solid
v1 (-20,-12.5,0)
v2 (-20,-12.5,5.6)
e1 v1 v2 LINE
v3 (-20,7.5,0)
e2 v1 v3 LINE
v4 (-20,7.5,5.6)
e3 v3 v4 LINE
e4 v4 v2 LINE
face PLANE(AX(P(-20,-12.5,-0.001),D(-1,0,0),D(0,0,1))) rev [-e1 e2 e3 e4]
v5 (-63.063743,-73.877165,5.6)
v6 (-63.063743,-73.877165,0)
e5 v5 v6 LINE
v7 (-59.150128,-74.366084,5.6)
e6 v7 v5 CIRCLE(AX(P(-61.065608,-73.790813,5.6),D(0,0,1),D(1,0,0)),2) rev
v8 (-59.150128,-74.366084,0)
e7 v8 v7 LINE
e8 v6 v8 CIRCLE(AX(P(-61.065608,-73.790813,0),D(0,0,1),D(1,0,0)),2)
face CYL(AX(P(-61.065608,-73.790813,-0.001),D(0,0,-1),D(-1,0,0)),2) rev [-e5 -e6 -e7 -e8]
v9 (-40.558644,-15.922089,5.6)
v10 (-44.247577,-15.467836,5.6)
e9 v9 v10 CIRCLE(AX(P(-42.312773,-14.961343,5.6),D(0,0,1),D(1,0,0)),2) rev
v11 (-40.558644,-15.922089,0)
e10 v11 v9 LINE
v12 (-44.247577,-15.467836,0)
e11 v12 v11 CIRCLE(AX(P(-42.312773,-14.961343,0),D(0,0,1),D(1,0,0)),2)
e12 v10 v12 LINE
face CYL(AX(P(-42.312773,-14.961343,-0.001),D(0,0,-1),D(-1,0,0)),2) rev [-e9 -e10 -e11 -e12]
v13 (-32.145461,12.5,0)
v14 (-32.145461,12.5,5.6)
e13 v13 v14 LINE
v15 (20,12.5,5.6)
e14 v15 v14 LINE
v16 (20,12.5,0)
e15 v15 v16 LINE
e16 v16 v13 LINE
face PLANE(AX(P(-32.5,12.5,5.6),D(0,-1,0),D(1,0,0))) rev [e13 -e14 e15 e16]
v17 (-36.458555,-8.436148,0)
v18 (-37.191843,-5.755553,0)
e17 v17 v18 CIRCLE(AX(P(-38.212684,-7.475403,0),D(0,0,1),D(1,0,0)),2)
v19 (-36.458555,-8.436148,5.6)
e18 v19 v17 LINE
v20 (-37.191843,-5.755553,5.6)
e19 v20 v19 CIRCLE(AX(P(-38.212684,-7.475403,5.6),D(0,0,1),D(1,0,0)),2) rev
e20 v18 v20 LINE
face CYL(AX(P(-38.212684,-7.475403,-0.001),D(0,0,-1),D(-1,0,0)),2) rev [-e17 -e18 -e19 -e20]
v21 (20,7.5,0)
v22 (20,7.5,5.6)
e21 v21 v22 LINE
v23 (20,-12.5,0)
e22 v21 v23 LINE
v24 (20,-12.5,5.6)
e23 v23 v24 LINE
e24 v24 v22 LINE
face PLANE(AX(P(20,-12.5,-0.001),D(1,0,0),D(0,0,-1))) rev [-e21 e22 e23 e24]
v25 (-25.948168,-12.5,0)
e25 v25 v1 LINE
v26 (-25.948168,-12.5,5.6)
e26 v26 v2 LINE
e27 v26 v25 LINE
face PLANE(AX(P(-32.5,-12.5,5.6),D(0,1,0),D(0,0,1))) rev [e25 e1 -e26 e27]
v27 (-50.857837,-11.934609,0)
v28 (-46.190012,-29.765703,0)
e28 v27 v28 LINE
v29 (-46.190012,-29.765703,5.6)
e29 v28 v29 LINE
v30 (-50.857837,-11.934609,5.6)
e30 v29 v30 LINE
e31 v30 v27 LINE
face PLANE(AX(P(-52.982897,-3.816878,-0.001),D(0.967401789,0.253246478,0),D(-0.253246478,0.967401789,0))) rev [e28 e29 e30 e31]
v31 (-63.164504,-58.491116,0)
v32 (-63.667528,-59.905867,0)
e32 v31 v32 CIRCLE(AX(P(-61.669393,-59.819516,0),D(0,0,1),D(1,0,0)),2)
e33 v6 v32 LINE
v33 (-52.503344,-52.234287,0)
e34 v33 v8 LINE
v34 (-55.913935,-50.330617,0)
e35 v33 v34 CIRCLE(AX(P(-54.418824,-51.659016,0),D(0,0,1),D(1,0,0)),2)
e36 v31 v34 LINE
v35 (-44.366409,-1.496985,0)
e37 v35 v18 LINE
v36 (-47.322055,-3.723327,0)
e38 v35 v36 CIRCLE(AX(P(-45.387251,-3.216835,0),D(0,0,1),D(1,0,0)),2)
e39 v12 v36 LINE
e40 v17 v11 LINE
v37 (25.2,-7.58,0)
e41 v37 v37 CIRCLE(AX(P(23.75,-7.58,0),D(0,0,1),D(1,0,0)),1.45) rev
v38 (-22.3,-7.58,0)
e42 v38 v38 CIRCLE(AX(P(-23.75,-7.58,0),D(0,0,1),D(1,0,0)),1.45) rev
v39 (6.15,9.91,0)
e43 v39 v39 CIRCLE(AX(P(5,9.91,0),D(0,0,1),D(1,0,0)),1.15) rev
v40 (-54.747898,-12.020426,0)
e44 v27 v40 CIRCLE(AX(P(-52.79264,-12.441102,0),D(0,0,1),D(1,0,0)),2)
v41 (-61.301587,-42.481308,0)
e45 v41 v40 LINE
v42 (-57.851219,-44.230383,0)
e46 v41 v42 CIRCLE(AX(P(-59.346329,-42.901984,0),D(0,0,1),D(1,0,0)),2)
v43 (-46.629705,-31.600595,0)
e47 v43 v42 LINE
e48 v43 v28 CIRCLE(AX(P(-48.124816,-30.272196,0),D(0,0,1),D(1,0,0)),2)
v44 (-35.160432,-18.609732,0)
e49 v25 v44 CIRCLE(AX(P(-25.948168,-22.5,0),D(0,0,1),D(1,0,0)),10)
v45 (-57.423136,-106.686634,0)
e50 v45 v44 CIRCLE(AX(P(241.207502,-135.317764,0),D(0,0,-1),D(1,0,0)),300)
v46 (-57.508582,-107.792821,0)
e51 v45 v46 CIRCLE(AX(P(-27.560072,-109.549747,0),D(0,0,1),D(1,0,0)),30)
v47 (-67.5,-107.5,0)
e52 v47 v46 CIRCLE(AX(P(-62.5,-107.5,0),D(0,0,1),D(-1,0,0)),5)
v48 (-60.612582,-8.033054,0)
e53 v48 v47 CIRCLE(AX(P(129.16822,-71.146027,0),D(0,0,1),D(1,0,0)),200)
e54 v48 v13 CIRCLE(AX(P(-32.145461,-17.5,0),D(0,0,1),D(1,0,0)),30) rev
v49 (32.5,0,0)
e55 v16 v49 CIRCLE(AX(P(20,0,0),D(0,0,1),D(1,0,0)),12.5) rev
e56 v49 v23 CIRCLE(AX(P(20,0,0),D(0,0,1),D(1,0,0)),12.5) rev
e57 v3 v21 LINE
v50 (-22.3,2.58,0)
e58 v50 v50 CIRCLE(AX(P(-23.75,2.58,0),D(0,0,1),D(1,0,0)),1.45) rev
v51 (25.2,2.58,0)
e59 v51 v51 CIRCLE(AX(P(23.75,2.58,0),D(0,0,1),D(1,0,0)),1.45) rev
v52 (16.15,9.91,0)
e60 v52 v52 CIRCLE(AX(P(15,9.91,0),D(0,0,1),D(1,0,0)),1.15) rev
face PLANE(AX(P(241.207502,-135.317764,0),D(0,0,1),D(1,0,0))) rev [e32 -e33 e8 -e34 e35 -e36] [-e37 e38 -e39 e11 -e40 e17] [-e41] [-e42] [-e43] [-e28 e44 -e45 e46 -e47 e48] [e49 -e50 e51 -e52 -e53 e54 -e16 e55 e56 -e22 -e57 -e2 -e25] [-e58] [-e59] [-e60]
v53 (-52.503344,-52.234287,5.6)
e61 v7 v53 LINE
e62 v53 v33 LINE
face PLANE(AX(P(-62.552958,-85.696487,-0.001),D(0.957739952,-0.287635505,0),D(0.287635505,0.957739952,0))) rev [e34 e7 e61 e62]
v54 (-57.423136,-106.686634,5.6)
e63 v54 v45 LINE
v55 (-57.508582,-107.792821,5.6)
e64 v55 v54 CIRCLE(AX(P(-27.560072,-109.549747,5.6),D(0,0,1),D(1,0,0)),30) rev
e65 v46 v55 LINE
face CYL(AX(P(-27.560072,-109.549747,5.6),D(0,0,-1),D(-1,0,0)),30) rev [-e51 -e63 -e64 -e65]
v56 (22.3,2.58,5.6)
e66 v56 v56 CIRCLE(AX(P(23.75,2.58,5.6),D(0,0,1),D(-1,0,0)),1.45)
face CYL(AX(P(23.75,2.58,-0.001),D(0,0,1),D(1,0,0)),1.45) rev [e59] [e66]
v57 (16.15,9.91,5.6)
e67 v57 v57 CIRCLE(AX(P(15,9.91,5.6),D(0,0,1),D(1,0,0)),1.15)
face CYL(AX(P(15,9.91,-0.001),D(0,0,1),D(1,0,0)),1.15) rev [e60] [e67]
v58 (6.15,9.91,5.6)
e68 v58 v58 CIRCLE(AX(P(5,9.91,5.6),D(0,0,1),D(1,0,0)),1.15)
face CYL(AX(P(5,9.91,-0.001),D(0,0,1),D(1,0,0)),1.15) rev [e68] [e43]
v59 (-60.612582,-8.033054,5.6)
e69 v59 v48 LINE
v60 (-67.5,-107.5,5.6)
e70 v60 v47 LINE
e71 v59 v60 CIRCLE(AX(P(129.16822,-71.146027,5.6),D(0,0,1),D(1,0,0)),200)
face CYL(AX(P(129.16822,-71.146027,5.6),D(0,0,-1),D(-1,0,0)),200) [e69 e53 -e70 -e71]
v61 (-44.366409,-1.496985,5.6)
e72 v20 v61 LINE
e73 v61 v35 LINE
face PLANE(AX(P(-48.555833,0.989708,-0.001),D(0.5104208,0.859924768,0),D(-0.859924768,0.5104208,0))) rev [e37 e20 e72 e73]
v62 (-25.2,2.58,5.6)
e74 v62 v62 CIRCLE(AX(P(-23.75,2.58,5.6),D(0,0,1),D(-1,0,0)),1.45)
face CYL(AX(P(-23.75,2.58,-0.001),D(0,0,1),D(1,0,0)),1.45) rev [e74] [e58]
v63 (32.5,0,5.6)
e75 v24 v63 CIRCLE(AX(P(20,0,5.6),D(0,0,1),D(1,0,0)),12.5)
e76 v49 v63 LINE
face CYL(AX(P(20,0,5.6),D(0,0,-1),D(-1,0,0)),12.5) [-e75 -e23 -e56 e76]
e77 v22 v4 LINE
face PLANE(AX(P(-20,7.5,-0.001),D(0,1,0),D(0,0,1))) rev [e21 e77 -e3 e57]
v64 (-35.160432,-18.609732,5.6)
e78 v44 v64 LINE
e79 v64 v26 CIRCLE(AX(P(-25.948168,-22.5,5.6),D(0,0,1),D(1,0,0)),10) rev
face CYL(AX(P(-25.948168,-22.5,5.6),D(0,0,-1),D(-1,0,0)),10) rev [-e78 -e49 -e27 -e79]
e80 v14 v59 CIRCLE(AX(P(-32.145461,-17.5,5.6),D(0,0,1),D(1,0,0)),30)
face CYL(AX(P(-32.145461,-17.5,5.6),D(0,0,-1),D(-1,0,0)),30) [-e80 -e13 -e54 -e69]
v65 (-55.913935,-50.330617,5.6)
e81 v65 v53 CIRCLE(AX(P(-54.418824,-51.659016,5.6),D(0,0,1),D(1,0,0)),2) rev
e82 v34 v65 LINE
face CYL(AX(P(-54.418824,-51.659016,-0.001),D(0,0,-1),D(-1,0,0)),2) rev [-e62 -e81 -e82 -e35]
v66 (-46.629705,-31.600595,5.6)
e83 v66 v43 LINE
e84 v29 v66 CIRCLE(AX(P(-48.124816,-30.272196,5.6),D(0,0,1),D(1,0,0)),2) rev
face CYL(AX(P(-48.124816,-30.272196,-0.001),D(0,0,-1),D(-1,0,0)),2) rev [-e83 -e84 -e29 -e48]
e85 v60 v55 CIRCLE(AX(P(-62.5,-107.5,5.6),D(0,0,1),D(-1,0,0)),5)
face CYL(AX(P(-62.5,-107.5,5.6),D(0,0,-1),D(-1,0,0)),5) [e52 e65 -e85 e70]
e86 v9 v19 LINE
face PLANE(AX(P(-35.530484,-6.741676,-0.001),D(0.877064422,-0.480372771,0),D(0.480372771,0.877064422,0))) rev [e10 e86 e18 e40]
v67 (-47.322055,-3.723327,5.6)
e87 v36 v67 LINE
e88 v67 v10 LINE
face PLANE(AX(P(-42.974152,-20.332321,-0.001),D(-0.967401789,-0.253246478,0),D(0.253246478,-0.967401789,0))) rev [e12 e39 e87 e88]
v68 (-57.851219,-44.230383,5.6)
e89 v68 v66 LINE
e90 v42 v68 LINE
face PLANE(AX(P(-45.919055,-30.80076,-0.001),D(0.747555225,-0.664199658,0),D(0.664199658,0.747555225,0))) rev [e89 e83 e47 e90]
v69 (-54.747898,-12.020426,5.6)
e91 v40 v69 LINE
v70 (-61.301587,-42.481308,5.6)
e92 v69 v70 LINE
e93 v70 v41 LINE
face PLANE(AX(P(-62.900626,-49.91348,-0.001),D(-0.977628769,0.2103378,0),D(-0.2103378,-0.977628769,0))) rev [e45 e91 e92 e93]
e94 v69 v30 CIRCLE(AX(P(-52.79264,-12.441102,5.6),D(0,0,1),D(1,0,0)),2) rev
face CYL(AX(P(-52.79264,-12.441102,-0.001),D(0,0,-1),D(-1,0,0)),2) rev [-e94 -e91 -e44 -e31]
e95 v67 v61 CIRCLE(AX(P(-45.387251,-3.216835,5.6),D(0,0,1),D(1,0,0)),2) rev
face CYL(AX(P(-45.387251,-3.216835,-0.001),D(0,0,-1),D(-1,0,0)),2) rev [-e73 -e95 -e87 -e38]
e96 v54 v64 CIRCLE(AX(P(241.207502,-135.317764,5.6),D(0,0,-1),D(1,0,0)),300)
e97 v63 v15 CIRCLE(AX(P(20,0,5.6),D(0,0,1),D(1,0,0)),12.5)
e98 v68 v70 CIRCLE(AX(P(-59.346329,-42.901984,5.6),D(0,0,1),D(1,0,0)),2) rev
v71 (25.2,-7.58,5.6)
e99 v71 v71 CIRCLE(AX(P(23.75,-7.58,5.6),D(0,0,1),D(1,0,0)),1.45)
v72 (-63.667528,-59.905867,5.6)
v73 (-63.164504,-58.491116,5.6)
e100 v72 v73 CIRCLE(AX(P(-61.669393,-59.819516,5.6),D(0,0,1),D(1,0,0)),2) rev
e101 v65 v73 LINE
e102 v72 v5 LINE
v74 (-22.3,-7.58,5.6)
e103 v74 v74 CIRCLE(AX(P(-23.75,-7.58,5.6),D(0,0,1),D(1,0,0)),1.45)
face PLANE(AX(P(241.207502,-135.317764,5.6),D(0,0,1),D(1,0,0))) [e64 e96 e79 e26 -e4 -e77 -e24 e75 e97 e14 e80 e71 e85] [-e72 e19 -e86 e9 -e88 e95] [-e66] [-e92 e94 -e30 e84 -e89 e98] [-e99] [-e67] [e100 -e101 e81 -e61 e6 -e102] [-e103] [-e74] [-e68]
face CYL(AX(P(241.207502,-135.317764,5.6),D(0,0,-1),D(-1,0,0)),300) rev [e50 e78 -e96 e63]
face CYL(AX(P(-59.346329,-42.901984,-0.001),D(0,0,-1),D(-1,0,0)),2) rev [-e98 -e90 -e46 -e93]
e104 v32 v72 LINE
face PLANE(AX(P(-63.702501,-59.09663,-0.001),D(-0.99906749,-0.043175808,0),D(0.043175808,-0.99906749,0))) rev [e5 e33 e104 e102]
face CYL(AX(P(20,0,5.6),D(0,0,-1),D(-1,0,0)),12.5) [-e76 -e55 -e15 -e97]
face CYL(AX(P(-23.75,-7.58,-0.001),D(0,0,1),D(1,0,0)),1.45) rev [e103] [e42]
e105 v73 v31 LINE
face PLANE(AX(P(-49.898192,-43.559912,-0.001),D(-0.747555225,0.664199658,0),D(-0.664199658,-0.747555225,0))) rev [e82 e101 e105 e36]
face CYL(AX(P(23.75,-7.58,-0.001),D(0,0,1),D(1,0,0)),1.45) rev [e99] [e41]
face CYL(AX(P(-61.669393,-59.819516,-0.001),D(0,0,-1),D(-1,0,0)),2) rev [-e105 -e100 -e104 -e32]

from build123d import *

# Parameters (mm, degrees)
BOSS_EXTRU_1_DEPTH      = 5.6
ENL_V_MAT_EXTRU_1_REACH = 135.059
ESQUISSE2_W             = 40
ESQUISSE2_H             = 20
ENL_V_MAT_EXTRU_2_REACH = 135.059
ESQUISSE3_R             = 1.45
CONG_2_R                = 12.5
CONG_3_R                = 10
CONG_4_R                = 30
CONG_5_R                = 30
ENL_V_MAT_EXTRU_3_REACH = 135.059
CONG_6_R                = 2
ENL_V_MAT_EXTRU_4_REACH = 135.059
ESQUISSE5_R             = 1.15


# Some blends are built 0.0001 mm under size
with BuildPart() as part:
    # Esquisse1 → Boss.-Extru.1 (new body)
    with BuildSketch(Plane.XY):
        with BuildLine():
            Line((-32.5, 12.5), (-52.5, 12.5))
            ThreePointArc((-52.5, 12.5), (-69.287355537, -46.339080558), (-67.5, -107.5))
            ThreePointArc((-67.5, -107.5), (-62.5, -112.5), (-57.5, -107.5))
            ThreePointArc((-57.5, -107.5), (-48.914858734, -58.969774017), (-32.5, -12.5))
            Line((-32.5, -12.5), (32.5, -12.5))
            Line((32.5, -12.5), (32.5, 12.5))
            Line((32.5, 12.5), (-32.5, 12.5))
        make_face()
    extrude(amount=BOSS_EXTRU_1_DEPTH)

    # Esquisse2 → Enlèv. mat.-Extru.1 (cut, up to next)
    with BuildSketch(Plane.XY.offset(5.6), mode=Mode.PRIVATE) as enl_v_mat_extru_1_sk1:
        with Locations((0, -2.5)):
            Rectangle(ESQUISSE2_W, ESQUISSE2_H)
    enl_v_mat_extru_1_tool1 = extrude(enl_v_mat_extru_1_sk1.sketch, amount=-ENL_V_MAT_EXTRU_1_REACH, mode=Mode.PRIVATE) & part.part
    add(enl_v_mat_extru_1_tool1.solids().sort_by_distance((0, -2.5, 5.6))[0], mode=Mode.SUBTRACT)

    # Esquisse3 → Enlèv. mat.-Extru.2 (cut, up to next)
    with BuildSketch(Plane.XY.offset(5.6), mode=Mode.PRIVATE) as enl_v_mat_extru_2_sk1:
        with Locations((-23.75, -7.58)):
            Circle(ESQUISSE3_R)
    enl_v_mat_extru_2_tool1 = extrude(enl_v_mat_extru_2_sk1.sketch, amount=-ENL_V_MAT_EXTRU_2_REACH, mode=Mode.PRIVATE) & part.part
    # Esquisse3 → Enlèv. mat.-Extru.2 (cut, up to next)
    with BuildSketch(Plane.XY.offset(5.6), mode=Mode.PRIVATE) as enl_v_mat_extru_2_sk2:
        with Locations((23.75, -7.58)):
            Circle(ESQUISSE3_R)
    enl_v_mat_extru_2_tool2 = extrude(enl_v_mat_extru_2_sk2.sketch, amount=-ENL_V_MAT_EXTRU_2_REACH, mode=Mode.PRIVATE) & part.part
    # Esquisse3 → Enlèv. mat.-Extru.2 (cut, up to next)
    with BuildSketch(Plane.XY.offset(5.6), mode=Mode.PRIVATE) as enl_v_mat_extru_2_sk3:
        with Locations((23.75, 2.58)):
            Circle(ESQUISSE3_R)
    enl_v_mat_extru_2_tool3 = extrude(enl_v_mat_extru_2_sk3.sketch, amount=-ENL_V_MAT_EXTRU_2_REACH, mode=Mode.PRIVATE) & part.part
    # Esquisse3 → Enlèv. mat.-Extru.2 (cut, up to next)
    with BuildSketch(Plane.XY.offset(5.6), mode=Mode.PRIVATE) as enl_v_mat_extru_2_sk4:
        with Locations((-23.75, 2.58)):
            Circle(ESQUISSE3_R)
    enl_v_mat_extru_2_tool4 = extrude(enl_v_mat_extru_2_sk4.sketch, amount=-ENL_V_MAT_EXTRU_2_REACH, mode=Mode.PRIVATE) & part.part
    add(enl_v_mat_extru_2_tool1.solids().sort_by_distance((-23.75, -7.58, 5.6))[0], mode=Mode.SUBTRACT)
    add(enl_v_mat_extru_2_tool2.solids().sort_by_distance((23.75, -7.58, 5.6))[0], mode=Mode.SUBTRACT)
    add(enl_v_mat_extru_2_tool3.solids().sort_by_distance((23.75, 2.58, 5.6))[0], mode=Mode.SUBTRACT)
    add(enl_v_mat_extru_2_tool4.solids().sort_by_distance((-23.75, 2.58, 5.6))[0], mode=Mode.SUBTRACT)

    # Congé2
    cong_2_edges = [part.edges().sort_by_distance(p)[0] for p in [
        (32.5, -12.5, 2.8),
        (32.5, 12.5, 2.8),
    ]]
    fillet(cong_2_edges, radius=CONG_2_R - 0.0001)  # a hair under: the kernel refuses the full size

    # Congé3
    cong_3_edges = [part.edges().sort_by_distance(p)[0] for p in [
        (-32.5, -12.5, 2.8),
    ]]
    fillet(cong_3_edges, radius=CONG_3_R)

    # Congé4
    cong_4_edges = [part.edges().sort_by_distance(p)[0] for p in [
        (-52.5, 12.5, 2.8),
    ]]
    fillet(cong_4_edges, radius=CONG_4_R)

    # Congé5
    # the kernel refuses this fillet: 30 mm, written as the material it adds along each edge
    with BuildSketch(Plane(origin=(-57.5, -107.5, 0), x_dir=(-0.029294676062998543, -0.9995708188789647, 0), z_dir=(0, 0, 1))) as cong_5_piece_1:
        with BuildLine():
            CenterArc((1.171787043, 29.987124566), CONG_5_R, 266.202223448, 2.119075089)
            ThreePointArc((-0.815268333, 0.053003384), (-0.407652209, 0.026224165), (0, 0))
            ThreePointArc((0, 0), (0.14647338, 0.002145906), (0.292946761, 0))
        make_face()
    extrude(amount=5.6)

    # Esquisse4 → Enlèv. mat.-Extru.3 (cut, up to next)
    with BuildSketch(Plane.XY.offset(5.6), mode=Mode.PRIVATE) as enl_v_mat_extru_3_sk1:
        Polygon((-35.530484253, -6.741676359), (-42.974151572, -20.332321303), (-48.555833289, 0.989708193), align=None)
    enl_v_mat_extru_3_tool1 = extrude(enl_v_mat_extru_3_sk1.sketch, amount=-ENL_V_MAT_EXTRU_3_REACH, mode=Mode.PRIVATE) & part.part
    # Esquisse4 → Enlèv. mat.-Extru.3 (cut, up to next)
    with BuildSketch(Plane.XY.offset(5.6), mode=Mode.PRIVATE) as enl_v_mat_extru_3_sk2:
        Polygon((-52.982896502, -3.816878406), (-45.919055028, -30.800759586), (-62.900626013, -49.913479621), align=None)
    enl_v_mat_extru_3_tool2 = extrude(enl_v_mat_extru_3_sk2.sketch, amount=-ENL_V_MAT_EXTRU_3_REACH, mode=Mode.PRIVATE) & part.part
    # Esquisse4 → Enlèv. mat.-Extru.3 (cut, up to next)
    with BuildSketch(Plane.XY.offset(5.6), mode=Mode.PRIVATE) as enl_v_mat_extru_3_sk3:
        Polygon((-49.898192375, -43.559912364), (-63.702500518, -59.0966302), (-62.552958266, -85.696486809), align=None)
    enl_v_mat_extru_3_tool3 = extrude(enl_v_mat_extru_3_sk3.sketch, amount=-ENL_V_MAT_EXTRU_3_REACH, mode=Mode.PRIVATE) & part.part
    add(enl_v_mat_extru_3_tool1.solids().sort_by_distance((-42.35349, -8.694763, 5.6))[0], mode=Mode.SUBTRACT)
    add(enl_v_mat_extru_3_tool2.solids().sort_by_distance((-53.934193, -28.177039, 5.6))[0], mode=Mode.SUBTRACT)
    add(enl_v_mat_extru_3_tool3.solids().sort_by_distance((-58.717884, -62.784343, 5.6))[0], mode=Mode.SUBTRACT)

    # Congé6
    cong_6_edges = [part.edges().sort_by_distance(p)[0] for p in [
        (-48.555833289, 0.989708193, 2.8),
        (-35.530484253, -6.741676359, 2.8),
        (-42.974151572, -20.332321303, 2.8),
        (-62.900626013, -49.913479621, 2.8),
        (-52.982896502, -3.816878406, 2.8),
        (-45.919055028, -30.800759586, 2.8),
        (-49.898192375, -43.559912364, 2.8),
        (-62.552958266, -85.696486809, 2.8),
        (-63.702500518, -59.0966302, 2.8),
    ]]
    fillet(cong_6_edges, radius=CONG_6_R)

    # Esquisse5 → Enlèv. mat.-Extru.4 (cut, up to next)
    with BuildSketch(Plane.XY.offset(5.6), mode=Mode.PRIVATE) as enl_v_mat_extru_4_sk1:
        with Locations((15, 9.91)):
            Circle(ESQUISSE5_R)
    enl_v_mat_extru_4_tool1 = extrude(enl_v_mat_extru_4_sk1.sketch, amount=-ENL_V_MAT_EXTRU_4_REACH, mode=Mode.PRIVATE) & part.part
    # Esquisse5 → Enlèv. mat.-Extru.4 (cut, up to next)
    with BuildSketch(Plane.XY.offset(5.6), mode=Mode.PRIVATE) as enl_v_mat_extru_4_sk2:
        with Locations((5, 9.91)):
            Circle(ESQUISSE5_R)
    enl_v_mat_extru_4_tool2 = extrude(enl_v_mat_extru_4_sk2.sketch, amount=-ENL_V_MAT_EXTRU_4_REACH, mode=Mode.PRIVATE) & part.part
    add(enl_v_mat_extru_4_tool1.solids().sort_by_distance((15, 9.91, 5.6))[0], mode=Mode.SUBTRACT)
    add(enl_v_mat_extru_4_tool2.solids().sort_by_distance((5, 9.91, 5.6))[0], mode=Mode.SUBTRACT)


solid = part.part
